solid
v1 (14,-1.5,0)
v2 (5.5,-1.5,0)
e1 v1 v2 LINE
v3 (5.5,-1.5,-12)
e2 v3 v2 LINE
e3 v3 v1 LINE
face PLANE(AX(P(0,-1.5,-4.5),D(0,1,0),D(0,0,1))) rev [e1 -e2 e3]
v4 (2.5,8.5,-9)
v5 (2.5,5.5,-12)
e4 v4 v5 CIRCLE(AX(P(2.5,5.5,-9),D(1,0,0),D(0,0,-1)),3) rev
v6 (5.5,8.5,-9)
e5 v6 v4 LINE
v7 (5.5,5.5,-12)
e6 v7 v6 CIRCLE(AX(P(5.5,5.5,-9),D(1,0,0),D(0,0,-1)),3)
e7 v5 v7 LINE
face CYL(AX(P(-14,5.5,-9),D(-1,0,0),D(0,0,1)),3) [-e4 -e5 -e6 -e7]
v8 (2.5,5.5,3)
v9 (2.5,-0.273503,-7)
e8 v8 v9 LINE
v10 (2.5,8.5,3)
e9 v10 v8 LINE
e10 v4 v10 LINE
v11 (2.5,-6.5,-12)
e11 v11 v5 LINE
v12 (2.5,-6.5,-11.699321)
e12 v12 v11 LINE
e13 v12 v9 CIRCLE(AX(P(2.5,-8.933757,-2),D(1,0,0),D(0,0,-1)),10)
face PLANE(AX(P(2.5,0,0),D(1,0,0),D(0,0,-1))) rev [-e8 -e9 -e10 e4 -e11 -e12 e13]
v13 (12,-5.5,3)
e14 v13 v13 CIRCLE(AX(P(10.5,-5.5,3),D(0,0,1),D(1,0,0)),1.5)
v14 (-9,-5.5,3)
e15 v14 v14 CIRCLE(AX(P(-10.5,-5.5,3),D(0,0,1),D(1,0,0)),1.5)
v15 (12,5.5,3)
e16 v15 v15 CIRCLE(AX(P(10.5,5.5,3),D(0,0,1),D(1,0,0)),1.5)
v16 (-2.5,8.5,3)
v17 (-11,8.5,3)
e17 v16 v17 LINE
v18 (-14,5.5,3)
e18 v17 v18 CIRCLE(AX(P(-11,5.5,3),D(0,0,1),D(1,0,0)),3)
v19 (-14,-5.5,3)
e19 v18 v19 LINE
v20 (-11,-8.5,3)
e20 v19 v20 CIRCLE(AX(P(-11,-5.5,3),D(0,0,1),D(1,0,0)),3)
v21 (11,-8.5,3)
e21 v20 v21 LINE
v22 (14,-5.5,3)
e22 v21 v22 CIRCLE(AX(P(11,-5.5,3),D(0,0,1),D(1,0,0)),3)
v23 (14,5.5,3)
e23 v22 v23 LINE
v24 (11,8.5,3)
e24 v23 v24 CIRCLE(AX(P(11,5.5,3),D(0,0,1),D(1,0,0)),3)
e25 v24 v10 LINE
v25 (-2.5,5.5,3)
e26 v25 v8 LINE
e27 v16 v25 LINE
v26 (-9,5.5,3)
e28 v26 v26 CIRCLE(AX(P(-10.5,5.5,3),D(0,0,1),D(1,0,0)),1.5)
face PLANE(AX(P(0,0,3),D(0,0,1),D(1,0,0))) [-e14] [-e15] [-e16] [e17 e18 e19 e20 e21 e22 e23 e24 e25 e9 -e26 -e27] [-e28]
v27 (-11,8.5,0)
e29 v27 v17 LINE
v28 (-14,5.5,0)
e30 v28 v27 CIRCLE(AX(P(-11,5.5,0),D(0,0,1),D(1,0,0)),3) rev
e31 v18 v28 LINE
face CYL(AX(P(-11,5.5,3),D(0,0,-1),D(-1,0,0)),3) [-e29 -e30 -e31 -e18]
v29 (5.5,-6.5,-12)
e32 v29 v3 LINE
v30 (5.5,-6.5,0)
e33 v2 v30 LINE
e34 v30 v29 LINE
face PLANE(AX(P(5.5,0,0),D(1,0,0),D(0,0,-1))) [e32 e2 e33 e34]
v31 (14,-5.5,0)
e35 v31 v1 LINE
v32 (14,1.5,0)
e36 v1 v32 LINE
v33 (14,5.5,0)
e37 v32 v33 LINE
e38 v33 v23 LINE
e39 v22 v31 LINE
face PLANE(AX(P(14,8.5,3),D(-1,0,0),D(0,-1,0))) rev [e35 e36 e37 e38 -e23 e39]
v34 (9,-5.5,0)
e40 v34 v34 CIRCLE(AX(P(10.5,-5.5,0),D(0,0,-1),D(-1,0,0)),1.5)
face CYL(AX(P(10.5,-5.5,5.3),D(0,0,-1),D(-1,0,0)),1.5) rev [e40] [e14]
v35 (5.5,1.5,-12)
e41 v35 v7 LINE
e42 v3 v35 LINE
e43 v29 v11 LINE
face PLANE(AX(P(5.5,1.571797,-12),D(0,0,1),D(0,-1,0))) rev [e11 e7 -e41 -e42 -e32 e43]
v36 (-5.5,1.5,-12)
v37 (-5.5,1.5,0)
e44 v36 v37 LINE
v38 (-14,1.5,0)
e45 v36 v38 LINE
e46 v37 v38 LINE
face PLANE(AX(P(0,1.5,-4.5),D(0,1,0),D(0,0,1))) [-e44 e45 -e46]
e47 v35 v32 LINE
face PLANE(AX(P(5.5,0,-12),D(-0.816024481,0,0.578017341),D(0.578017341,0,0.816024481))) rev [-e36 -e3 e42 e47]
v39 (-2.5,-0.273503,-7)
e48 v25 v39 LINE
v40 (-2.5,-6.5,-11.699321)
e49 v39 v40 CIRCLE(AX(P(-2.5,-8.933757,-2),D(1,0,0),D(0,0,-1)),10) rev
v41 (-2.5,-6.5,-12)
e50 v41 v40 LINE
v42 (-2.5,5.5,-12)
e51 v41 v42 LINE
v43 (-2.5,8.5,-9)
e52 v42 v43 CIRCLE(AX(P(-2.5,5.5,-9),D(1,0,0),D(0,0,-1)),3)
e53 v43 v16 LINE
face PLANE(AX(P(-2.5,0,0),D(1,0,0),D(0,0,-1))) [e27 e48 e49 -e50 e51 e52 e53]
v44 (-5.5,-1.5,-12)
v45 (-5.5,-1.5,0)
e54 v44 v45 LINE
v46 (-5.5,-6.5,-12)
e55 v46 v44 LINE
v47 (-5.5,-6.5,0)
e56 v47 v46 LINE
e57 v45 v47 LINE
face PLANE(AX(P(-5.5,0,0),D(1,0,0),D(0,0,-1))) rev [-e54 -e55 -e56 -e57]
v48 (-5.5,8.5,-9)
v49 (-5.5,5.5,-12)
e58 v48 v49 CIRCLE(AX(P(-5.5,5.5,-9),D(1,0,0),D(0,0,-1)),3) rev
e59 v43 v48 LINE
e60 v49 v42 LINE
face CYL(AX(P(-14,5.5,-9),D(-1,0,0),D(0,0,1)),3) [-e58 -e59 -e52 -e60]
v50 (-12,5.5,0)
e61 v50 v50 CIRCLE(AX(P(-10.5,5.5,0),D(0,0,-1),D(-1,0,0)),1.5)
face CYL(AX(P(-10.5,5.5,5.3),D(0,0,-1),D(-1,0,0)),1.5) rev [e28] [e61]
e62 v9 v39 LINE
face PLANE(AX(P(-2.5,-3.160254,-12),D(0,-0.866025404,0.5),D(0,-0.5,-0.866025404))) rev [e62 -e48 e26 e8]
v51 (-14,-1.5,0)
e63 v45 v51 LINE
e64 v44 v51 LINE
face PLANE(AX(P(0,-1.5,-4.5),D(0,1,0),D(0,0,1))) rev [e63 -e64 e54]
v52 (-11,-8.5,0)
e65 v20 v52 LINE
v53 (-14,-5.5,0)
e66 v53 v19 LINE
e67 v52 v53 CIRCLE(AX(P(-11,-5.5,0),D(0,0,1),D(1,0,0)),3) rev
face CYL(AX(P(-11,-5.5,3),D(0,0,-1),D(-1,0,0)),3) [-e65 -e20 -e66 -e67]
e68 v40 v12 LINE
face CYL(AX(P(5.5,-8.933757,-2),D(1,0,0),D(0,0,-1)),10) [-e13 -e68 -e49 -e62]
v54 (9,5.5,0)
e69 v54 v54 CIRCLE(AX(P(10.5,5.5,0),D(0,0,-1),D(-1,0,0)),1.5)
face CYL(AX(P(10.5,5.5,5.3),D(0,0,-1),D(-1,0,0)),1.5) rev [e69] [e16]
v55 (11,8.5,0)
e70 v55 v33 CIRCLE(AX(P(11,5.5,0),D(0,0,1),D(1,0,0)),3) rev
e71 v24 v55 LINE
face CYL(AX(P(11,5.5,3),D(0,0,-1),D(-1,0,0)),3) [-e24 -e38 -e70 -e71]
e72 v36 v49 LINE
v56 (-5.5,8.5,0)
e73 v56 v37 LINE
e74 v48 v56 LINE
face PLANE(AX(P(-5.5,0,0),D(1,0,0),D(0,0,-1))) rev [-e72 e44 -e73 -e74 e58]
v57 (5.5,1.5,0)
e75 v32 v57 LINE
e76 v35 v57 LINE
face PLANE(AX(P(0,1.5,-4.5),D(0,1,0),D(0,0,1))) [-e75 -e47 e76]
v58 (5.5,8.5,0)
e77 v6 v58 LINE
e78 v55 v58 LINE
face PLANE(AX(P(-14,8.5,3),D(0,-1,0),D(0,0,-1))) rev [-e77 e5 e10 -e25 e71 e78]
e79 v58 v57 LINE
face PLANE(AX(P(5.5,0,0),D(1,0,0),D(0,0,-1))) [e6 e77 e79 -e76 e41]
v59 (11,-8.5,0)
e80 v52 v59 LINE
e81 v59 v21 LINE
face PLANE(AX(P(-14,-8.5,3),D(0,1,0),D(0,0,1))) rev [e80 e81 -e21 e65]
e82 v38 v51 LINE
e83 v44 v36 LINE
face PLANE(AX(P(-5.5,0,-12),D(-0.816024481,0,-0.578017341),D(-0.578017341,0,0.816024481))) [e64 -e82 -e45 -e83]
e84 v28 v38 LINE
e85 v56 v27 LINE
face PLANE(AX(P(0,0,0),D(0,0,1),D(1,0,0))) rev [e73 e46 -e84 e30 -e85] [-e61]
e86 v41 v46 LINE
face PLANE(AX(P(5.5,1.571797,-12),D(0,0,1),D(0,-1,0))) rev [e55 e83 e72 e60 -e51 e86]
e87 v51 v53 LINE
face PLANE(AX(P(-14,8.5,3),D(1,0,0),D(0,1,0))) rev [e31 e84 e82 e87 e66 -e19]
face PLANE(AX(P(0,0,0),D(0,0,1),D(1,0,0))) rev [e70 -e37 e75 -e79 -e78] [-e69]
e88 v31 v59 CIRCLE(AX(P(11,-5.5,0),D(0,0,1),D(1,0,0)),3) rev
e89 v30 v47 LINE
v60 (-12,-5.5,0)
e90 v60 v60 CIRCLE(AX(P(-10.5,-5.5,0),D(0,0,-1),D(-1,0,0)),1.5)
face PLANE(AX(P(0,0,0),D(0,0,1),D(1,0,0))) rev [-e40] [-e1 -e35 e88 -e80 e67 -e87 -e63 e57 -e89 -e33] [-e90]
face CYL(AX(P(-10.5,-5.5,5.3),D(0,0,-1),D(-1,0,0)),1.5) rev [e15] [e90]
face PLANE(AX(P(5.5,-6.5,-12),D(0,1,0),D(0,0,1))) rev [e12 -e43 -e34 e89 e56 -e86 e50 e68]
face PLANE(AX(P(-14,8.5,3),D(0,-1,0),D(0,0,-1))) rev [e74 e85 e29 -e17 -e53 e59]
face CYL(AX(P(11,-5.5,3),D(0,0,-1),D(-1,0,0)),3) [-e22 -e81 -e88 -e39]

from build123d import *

# Parameters (mm, degrees)
SKETCH_1_W          = 28
SKETCH_1_H          = 17
EXTRUDE_1_DEPTH     = 3
EXTRUDE_2_DEPTH     = 5.5
CUT_EXTRUDE_1_DEPTH = 2.5
RIB_4_REACH         = 22.304
SKETCH_5_WALL_W     = 57.313322178
SKETCH_5_WALL_H     = 3
FILLET_1_R          = 3
SKETCH_6_R          = 1.5
CUT_EXTRUDE_2_DEPTH = 5.3
EXTRUDE_3_DEPTH     = 5.5
CUT_EXTRUDE_3_DEPTH = 2.5
FILLET_3_R          = 3
FILLET_4_R          = 10


with BuildPart() as part:
    # 草图1 → 凸台-拉伸1 (new body)
    with BuildSketch(Plane.XY):
        Rectangle(SKETCH_1_W, SKETCH_1_H)
    extrude(amount=EXTRUDE_1_DEPTH)

    # 草图3 → 凸台-拉伸2 (add, symmetric)
    with BuildSketch(Plane(origin=(0, 0, 0), x_dir=(0, 0, -1), z_dir=(1, 0, 0))):
        Polygon((0, 8.5), (12, 1.57179677), (12, -6.5), (0, -6.5), (0, 1.57179677), align=None)
    extrude(amount=EXTRUDE_2_DEPTH, both=True)

    # 草图4 → 切除-拉伸1 (cut, symmetric)
    with BuildSketch(Plane(origin=(0, 0, 0), x_dir=(0, 0, -1), z_dir=(1, 0, 0))):
        Polygon((0, 8.5), (12, 1.57179677), (12, -3.160254038), (0, 3.767949192), (-3, 5.5), (-3, 10.232050808), align=None)
    extrude(amount=CUT_EXTRUDE_1_DEPTH, both=True, mode=Mode.SUBTRACT)

    # 草图5 wall → 筋4 (add, up to next)
    with BuildSketch(Plane(origin=(9.75, 0, -6), x_dir=(0.57801734078, 0, 0.816024481102), z_dir=(0.816024481102, 0, -0.57801734078)), mode=Mode.PRIVATE) as rib_4_sk1:
        Rectangle(SKETCH_5_WALL_W, SKETCH_5_WALL_H)
    rib_4_tool1 = extrude(rib_4_sk1.sketch, amount=-RIB_4_REACH, mode=Mode.PRIVATE) - part.part
    rib_4 = rib_4_tool1.solids().sort_by_distance((9.75, 0, -6))[0]
    add(rib_4)

    # 镜向1: 筋4 across plane
    add(rib_4.mirror(Plane(origin=(0, 0, 0), x_dir=(0, 0, 1), z_dir=(1, 0, 0))))

    # 圆角1
    fillet_1_edges = [part.edges().sort_by_distance(p)[0] for p in [
        (14, -8.5, 1.5),
        (-14, -8.5, 1.5),
        (-14, 8.5, 1.5),
        (14, 8.5, 1.5),
    ]]
    fillet(fillet_1_edges, radius=FILLET_1_R)

    # 草图6 → 切除-拉伸2 (cut)
    with BuildSketch(Plane(origin=(0, 0, 0), x_dir=(-1, 0, 0), z_dir=(0, 0, -1))):
        with Locations((-10.5, 5.5)):
            Circle(SKETCH_6_R)
        with Locations((10.5, 5.5)):
            Circle(SKETCH_6_R)
        with Locations((10.5, -5.5)):
            Circle(SKETCH_6_R)
        with Locations((-10.5, -5.5)):
            Circle(SKETCH_6_R)
    extrude(amount=-CUT_EXTRUDE_2_DEPTH, mode=Mode.SUBTRACT)

    # 草图7 → 凸台-拉伸3 (add, symmetric)
    with BuildSketch(Plane(origin=(0, 0, 0), x_dir=(0, 0, -1), z_dir=(1, 0, 0))):
        Polygon((0, 8.5), (12, 8.5), (12, 1.57179677), align=None)
    extrude(amount=EXTRUDE_3_DEPTH, both=True)

    # 草图7<2> → 切除-拉伸3 (cut, symmetric)
    with BuildSketch(Plane(origin=(0, 0, 0), x_dir=(0, 0, -1), z_dir=(1, 0, 0))):
        Polygon((0, 8.5), (12, 8.5), (12, 1.57179677), align=None)
    extrude(amount=CUT_EXTRUDE_3_DEPTH, both=True, mode=Mode.SUBTRACT)

    # 圆角3
    fillet_3_edges = [part.edges().sort_by_distance(p)[0] for p in [
        (4, 8.5, -12),
        (-4, 8.5, -12),
    ]]
    fillet(fillet_3_edges, radius=FILLET_3_R)

    # 圆角4
    # the kernel refuses this fillet: 10 mm, written as the material it takes off along each edge
    with BuildSketch(Plane(origin=(2.5, -3.160254038, -12), x_dir=(0, -1, 0), z_dir=(-1, 0, 0))) as fillet_4_piece_1:
        with BuildLine():
            CenterArc((FILLET_4_R * 0.57735026919, FILLET_4_R), FILLET_4_R, 210, 60)
            Line((-FILLET_4_R * 0.288675134595, FILLET_4_R * 0.5), (0, 0))
            Line((0, 0), (FILLET_4_R * 0.57735026919, 0))
        make_face()
    extrude(amount=5, mode=Mode.SUBTRACT)


solid = part.part
